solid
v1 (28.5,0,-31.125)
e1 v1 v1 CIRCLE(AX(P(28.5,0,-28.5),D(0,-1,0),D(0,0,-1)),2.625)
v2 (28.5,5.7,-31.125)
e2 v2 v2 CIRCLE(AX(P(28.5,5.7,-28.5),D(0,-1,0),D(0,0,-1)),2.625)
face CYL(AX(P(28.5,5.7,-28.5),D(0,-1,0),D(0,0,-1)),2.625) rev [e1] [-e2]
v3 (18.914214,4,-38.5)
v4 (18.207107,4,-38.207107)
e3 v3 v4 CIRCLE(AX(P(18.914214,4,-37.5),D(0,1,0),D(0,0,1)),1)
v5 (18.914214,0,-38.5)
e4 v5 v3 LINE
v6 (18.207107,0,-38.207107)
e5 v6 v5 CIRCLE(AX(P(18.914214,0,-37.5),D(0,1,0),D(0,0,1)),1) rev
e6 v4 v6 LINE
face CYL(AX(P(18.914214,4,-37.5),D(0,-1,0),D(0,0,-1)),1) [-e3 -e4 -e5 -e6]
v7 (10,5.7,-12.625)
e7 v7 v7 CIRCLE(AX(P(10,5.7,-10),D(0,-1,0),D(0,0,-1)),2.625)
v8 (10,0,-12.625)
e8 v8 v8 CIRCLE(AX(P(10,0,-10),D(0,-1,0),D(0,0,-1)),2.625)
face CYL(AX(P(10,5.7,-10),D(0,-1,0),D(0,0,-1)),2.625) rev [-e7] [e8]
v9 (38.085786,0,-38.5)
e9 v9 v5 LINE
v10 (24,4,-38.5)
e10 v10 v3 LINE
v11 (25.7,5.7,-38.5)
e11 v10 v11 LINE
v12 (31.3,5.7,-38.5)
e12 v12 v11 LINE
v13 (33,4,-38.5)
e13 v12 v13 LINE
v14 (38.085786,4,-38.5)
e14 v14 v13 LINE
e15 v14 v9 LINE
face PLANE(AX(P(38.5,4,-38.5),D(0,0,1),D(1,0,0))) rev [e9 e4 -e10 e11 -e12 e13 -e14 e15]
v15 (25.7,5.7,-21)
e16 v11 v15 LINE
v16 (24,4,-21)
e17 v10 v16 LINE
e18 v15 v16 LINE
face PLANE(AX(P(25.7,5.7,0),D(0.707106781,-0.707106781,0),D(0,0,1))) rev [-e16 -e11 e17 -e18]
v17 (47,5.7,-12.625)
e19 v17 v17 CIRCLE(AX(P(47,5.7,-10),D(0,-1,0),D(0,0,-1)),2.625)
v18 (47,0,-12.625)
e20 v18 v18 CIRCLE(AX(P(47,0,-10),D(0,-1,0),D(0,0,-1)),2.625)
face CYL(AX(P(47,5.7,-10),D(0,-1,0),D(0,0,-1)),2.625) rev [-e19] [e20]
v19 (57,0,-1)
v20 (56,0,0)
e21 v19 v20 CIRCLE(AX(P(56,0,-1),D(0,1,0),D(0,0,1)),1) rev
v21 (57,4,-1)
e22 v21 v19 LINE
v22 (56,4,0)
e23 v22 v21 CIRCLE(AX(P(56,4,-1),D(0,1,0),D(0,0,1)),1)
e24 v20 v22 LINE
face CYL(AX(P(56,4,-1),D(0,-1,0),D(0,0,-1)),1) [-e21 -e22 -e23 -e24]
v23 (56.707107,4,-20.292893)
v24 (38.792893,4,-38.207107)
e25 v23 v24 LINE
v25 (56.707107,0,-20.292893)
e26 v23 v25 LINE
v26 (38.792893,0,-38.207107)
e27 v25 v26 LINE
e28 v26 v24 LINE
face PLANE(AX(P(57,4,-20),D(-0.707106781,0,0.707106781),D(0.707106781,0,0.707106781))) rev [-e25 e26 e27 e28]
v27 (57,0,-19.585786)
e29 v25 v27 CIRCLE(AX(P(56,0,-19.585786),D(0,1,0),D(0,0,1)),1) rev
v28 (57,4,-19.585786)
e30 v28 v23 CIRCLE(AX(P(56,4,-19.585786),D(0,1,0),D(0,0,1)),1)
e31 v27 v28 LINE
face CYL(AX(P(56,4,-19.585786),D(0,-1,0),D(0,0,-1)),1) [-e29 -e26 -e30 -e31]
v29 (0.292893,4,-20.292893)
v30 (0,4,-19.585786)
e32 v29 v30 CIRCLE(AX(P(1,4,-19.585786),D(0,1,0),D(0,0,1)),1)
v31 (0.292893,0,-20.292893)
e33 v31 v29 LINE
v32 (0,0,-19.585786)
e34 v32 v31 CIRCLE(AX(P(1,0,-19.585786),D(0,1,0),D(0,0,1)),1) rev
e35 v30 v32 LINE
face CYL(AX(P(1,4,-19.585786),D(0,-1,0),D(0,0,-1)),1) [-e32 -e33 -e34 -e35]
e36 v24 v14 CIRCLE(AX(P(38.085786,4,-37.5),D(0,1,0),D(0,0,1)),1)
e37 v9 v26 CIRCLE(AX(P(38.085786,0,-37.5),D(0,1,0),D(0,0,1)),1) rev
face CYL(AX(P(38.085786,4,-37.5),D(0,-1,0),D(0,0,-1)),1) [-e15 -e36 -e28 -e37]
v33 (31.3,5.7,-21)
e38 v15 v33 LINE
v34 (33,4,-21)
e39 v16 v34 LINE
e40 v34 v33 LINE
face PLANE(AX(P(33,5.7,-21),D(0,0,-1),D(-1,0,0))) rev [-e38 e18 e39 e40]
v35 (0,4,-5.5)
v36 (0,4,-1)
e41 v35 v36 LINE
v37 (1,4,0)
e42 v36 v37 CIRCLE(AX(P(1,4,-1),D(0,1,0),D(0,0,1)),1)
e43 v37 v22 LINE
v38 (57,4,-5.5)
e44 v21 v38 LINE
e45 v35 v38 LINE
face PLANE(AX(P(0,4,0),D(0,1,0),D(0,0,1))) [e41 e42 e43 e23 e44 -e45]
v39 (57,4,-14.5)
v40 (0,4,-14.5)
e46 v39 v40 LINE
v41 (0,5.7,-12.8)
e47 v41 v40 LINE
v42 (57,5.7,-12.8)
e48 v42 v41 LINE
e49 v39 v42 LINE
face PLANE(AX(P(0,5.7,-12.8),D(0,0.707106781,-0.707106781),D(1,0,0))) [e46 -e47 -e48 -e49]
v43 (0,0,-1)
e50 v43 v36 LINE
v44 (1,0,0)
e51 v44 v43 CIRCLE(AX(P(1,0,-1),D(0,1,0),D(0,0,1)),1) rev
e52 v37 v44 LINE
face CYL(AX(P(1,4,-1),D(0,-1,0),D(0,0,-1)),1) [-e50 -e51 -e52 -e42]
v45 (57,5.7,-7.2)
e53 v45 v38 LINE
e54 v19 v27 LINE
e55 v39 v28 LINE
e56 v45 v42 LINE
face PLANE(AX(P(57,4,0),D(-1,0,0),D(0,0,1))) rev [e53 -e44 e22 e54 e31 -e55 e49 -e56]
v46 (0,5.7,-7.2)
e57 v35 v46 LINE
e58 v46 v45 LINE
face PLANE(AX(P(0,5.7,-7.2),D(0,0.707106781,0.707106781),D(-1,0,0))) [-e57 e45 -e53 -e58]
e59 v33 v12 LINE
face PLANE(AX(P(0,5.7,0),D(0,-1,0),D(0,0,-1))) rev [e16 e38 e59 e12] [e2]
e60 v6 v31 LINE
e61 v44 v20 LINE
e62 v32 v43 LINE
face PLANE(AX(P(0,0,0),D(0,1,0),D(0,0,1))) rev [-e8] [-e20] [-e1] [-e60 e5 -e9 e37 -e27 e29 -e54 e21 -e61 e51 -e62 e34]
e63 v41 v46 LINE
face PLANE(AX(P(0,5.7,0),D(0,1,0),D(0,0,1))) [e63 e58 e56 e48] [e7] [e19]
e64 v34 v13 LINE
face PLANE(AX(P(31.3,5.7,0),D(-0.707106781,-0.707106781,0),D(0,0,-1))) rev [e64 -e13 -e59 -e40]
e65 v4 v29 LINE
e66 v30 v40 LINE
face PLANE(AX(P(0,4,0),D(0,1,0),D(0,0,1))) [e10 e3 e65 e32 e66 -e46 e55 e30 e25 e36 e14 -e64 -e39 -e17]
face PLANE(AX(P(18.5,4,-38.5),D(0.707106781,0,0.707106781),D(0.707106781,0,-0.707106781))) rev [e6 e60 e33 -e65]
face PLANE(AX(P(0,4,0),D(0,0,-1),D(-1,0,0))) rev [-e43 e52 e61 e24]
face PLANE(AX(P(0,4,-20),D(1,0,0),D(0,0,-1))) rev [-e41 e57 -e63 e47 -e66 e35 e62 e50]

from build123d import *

# Parameters (mm, degrees)
BOSS_EXTRUDE1_DEPTH = 4
SKETCH2_W           = 9
SKETCH2_H           = 17.5
SKETCH2_W_2         = 57
SKETCH2_H_2         = 9
BOSS_EXTRUDE2_DEPTH = 1.7
CHAMFER1_SIZE       = 1.7
SKETCH4_R           = 2.625
CUT_EXTRUDE1_DEPTH  = 70.019852217
FILLET1_R           = 1


with BuildPart() as part:
    # Sketch1 → Boss-Extrude1 (new body)
    with BuildSketch(Plane(origin=(0, 0, 0), x_dir=(1, 0, 0), z_dir=(0, 1, 0))):
        Polygon((0, 0), (57, 0), (57, 20), (38.5, 38.5), (18.5, 38.5), (0, 20), align=None)
    extrude(amount=BOSS_EXTRUDE1_DEPTH)

    # Sketch2 → Boss-Extrude2 (add)
    with BuildSketch(Plane(origin=(0, 4, 0), x_dir=(1, 0, 0), z_dir=(0, 1, 0))):
        with Locations((28.5, 29.75)):
            Rectangle(SKETCH2_W, SKETCH2_H)
        with Locations((28.5, 10)):
            Rectangle(SKETCH2_W_2, SKETCH2_H_2)
    extrude(amount=BOSS_EXTRUDE2_DEPTH)

    # Chamfer1
    chamfer1_edges = [part.edges().sort_by_distance(p)[0] for p in [
        (33, 5.7, -29.75),
        (28.5, 5.7, -14.5),
        (24, 5.7, -29.75),
        (28.5, 5.7, -5.5),
    ]]
    chamfer(chamfer1_edges, length=CHAMFER1_SIZE - 0.0001)  # a hair under: the kernel refuses the full size

    # Sketch4 → Cut-Extrude1 (cut, through all)
    with BuildSketch(Plane.XZ):
        with Locations(Location((10, -10, 0), (0, 0, 270))):
            Circle(SKETCH4_R)
        with Locations(Location((47, -10, 0), (0, 0, 270))):
            Circle(SKETCH4_R)
        with Locations(Location((28.5, -28.5, 0), (0, 0, 270))):
            Circle(SKETCH4_R)
    extrude(amount=-CUT_EXTRUDE1_DEPTH, mode=Mode.SUBTRACT)

    # Fillet1
    fillet1_edges = [part.edges().sort_by_distance(p)[0] for p in [
        (0, 2, -20),
        (18.5, 2, -38.5),
        (38.5, 2, -38.5),
        (57, 2, -20),
        (57, 2, 0),
        (0, 2, 0),
    ]]
    fillet(fillet1_edges, radius=FILLET1_R)


solid = part.part
